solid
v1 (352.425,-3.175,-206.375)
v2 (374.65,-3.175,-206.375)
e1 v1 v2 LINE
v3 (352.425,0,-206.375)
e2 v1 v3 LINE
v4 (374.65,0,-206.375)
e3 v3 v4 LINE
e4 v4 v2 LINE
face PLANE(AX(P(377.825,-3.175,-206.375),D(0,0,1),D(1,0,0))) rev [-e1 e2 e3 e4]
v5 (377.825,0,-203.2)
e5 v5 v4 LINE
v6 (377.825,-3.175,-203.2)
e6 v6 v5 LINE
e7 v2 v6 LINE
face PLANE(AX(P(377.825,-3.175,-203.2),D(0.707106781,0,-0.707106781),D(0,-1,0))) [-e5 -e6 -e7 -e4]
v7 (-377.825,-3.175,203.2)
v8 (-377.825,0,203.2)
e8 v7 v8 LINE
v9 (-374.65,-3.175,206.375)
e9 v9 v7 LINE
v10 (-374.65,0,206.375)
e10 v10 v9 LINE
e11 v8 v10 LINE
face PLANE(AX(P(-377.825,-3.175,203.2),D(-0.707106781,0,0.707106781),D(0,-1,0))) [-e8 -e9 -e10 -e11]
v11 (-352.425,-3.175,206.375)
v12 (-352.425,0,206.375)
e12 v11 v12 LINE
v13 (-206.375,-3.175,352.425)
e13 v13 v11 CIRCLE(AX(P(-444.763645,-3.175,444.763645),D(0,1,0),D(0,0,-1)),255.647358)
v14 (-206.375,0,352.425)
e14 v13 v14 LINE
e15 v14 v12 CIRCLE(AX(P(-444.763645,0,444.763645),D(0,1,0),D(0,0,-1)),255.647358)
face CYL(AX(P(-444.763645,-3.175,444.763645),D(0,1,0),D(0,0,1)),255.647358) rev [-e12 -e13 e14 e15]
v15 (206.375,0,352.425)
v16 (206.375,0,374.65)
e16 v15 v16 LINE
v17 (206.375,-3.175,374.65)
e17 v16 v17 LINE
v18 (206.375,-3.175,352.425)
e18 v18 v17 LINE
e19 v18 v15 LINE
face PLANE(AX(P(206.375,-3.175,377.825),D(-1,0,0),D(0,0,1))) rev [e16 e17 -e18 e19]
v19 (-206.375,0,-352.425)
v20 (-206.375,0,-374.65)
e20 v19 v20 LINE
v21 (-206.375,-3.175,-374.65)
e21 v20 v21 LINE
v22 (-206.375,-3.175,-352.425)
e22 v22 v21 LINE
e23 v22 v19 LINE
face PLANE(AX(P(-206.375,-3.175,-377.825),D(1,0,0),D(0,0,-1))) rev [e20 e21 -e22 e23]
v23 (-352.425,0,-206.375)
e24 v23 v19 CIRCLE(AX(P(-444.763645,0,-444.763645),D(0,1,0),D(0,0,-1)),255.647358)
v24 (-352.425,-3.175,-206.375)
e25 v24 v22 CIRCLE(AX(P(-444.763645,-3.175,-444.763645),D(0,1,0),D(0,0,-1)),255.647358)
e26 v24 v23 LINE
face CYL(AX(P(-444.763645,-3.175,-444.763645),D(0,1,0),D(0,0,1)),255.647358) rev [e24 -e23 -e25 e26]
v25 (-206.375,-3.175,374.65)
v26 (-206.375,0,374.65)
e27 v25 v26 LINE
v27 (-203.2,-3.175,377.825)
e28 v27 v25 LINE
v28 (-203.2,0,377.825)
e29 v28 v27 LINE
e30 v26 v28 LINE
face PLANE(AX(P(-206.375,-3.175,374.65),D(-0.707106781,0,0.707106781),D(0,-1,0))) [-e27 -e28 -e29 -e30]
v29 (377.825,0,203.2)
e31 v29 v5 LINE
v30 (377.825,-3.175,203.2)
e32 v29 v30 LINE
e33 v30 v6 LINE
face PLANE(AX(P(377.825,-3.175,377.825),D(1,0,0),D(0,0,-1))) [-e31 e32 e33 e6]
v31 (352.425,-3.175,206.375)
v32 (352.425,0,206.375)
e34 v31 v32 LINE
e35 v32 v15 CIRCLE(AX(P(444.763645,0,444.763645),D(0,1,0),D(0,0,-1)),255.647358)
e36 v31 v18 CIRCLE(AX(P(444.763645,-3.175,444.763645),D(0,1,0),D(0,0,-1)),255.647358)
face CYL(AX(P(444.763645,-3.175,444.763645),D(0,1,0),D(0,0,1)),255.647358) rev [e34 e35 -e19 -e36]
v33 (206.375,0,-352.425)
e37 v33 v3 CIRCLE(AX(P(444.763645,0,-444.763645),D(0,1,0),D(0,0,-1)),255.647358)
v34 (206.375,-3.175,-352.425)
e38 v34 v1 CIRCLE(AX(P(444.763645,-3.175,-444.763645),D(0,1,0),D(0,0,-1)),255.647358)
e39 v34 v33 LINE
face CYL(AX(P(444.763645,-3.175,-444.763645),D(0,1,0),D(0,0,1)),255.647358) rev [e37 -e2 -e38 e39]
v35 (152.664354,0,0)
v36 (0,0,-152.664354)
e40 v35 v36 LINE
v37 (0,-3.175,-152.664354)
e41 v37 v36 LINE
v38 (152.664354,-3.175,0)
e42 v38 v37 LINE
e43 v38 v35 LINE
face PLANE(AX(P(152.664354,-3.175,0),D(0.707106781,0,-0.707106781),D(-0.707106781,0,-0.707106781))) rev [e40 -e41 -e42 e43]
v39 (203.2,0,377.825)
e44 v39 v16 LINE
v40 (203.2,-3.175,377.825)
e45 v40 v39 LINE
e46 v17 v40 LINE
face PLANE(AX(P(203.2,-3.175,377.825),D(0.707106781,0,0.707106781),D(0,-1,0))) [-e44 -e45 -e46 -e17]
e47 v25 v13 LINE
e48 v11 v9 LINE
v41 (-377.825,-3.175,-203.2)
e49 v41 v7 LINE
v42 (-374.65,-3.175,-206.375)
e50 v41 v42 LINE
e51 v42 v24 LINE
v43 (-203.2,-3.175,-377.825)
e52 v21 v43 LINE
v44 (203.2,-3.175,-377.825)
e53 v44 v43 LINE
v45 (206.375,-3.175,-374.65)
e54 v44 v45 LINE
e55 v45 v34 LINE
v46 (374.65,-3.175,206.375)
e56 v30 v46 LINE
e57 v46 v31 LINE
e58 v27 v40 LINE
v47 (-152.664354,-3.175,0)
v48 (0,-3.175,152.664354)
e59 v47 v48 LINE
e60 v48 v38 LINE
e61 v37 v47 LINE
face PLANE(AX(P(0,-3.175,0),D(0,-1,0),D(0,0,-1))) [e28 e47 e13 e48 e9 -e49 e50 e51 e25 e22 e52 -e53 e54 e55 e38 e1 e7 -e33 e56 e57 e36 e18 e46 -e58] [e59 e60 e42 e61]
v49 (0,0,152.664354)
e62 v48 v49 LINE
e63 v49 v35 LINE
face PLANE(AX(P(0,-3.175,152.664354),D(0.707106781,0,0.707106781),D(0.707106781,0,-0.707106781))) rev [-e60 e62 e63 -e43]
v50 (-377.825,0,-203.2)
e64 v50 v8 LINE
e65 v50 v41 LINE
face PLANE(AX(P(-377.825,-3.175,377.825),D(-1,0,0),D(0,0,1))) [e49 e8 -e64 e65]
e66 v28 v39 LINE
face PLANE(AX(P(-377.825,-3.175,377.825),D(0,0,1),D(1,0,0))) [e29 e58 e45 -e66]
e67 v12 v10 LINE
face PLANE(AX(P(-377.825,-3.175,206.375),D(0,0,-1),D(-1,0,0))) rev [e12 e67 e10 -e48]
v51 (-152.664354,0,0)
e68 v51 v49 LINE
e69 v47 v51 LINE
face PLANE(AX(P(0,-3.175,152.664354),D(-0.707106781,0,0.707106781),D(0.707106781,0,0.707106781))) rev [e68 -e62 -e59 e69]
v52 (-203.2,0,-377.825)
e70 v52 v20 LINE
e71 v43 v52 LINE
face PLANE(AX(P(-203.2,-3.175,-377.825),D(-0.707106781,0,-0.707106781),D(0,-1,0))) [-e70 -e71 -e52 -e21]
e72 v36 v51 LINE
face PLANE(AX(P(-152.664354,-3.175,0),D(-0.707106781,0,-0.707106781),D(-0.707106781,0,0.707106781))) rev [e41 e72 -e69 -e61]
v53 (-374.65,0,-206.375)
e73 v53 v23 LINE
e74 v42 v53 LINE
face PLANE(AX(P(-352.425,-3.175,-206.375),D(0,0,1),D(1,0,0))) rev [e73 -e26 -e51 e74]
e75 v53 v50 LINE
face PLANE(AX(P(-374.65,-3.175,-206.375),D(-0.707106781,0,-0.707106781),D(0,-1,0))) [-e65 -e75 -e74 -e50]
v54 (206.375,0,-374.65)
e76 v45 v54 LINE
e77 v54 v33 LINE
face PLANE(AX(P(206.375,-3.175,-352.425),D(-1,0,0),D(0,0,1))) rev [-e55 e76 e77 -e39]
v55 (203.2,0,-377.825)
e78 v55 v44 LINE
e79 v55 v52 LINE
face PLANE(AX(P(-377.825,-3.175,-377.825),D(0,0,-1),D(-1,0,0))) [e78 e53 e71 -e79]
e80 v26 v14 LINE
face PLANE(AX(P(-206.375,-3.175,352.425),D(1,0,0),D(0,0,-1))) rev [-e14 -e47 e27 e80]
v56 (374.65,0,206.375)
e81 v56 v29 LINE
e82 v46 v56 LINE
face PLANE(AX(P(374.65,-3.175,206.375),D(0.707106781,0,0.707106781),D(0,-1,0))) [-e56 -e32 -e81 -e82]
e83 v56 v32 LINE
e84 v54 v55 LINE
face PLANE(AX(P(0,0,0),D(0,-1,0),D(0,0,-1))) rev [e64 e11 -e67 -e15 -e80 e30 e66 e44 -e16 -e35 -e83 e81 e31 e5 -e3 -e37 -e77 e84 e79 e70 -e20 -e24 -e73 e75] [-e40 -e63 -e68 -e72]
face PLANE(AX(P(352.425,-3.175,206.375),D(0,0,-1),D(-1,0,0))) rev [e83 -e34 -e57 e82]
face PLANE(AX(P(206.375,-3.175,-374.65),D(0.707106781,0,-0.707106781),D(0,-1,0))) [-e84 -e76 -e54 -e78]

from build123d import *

# Parameters (mm, degrees)
SKETCH2_W           = 755.65
SKETCH2_H           = 755.65
BASE_FLANGE1_DEPTH  = 3.175
CUT_EXTRUDE1_DEPTH  = 535.334672162
CUT_EXTRUDE2_DEPTH  = 535.334672162
BREAK_CORNER1_START = -3.175
BREAK_CORNER1_DEPTH = 3.175


# Read off the part's stored shape, not the designer's step: Break-Corner1
# Sheet-metal steps are written as plain solids
with BuildPart() as part:
    # Sketch2 → Base-Flange1 (new body)
    with BuildSketch(Plane(origin=(0, 0, 0), x_dir=(1, 0, 0), z_dir=(0, 1, 0))):
        Rectangle(SKETCH2_W, SKETCH2_H)
    extrude(amount=-BASE_FLANGE1_DEPTH)

    # Sketch3 → Cut-Extrude1 (cut, through all)
    with BuildSketch(Plane(origin=(0, 0, 0), x_dir=(1, 0, 0), z_dir=(0, 1, 0))):
        Polygon((0, -152.664354058), (152.664354058, 0), (0, 152.664354058), (-152.664354058, 0), align=None)
    extrude(amount=-CUT_EXTRUDE1_DEPTH, mode=Mode.SUBTRACT)

    # Sketch4 → Cut-Extrude2 (cut, through all)
    with BuildSketch(Plane(origin=(0, 0, 0), x_dir=(1, 0, 0), z_dir=(0, 1, 0))):
        with BuildLine():
            Line((377.825, 206.375), (352.425, 206.375))
            ThreePointArc((352.425, 206.375), (263.993664919, 263.993664919), (206.375, 352.425))
            Line((206.375, 352.425), (206.375, 377.825))
            Line((206.375, 377.825), (377.825, 377.825))
            Line((377.825, 377.825), (377.825, 206.375))
        make_face()
        with BuildLine():
            Line((206.375, -377.825), (206.375, -352.425))
            ThreePointArc((206.375, -352.425), (263.993664919, -263.993664919), (352.425, -206.375))
            Line((352.425, -206.375), (377.825, -206.375))
            Line((377.825, -206.375), (377.825, -377.825))
            Line((377.825, -377.825), (206.375, -377.825))
        make_face()
        with BuildLine():
            Line((-377.825, -206.375), (-352.425, -206.375))
            ThreePointArc((-352.425, -206.375), (-263.993664919, -263.993664919), (-206.375, -352.425))
            Line((-206.375, -352.425), (-206.375, -377.825))
            Line((-206.375, -377.825), (-377.825, -377.825))
            Line((-377.825, -377.825), (-377.825, -206.375))
        make_face()
        with BuildLine():
            Line((-206.375, 377.825), (-206.375, 352.425))
            ThreePointArc((-206.375, 352.425), (-263.993664919, 263.993664919), (-352.425, 206.375))
            Line((-352.425, 206.375), (-377.825, 206.375))
            Line((-377.825, 206.375), (-377.825, 377.825))
            Line((-377.825, 377.825), (-206.375, 377.825))
        make_face()
    extrude(amount=-CUT_EXTRUDE2_DEPTH, mode=Mode.SUBTRACT)

    # Break-Corner1 outline → Break-Corner1 (cut)
    with BuildSketch(Plane(origin=(0, 0, 0), x_dir=(1, 0, 0), z_dir=(0, 1, 0)).offset(BREAK_CORNER1_START)):
        Polygon((-206.375, 374.65), (-203.2, 377.825), (-206.375, 377.825), align=None)
        Polygon((203.2, 377.825), (206.375, 374.65), (206.375, 377.825), align=None)
        Polygon((377.825, -206.375), (377.825, -203.2), (374.65, -206.375), align=None)
        Polygon((374.65, 206.375), (377.825, 203.2), (377.825, 206.375), align=None)
        Polygon((-374.65, -206.375), (-377.825, -203.2), (-377.825, -206.375), align=None)
        Polygon((-377.825, 203.2), (-374.65, 206.375), (-377.825, 206.375), align=None)
        Polygon((206.375, -374.65), (203.2, -377.825), (206.375, -377.825), align=None)
        Polygon((-203.2, -377.825), (-206.375, -374.65), (-206.375, -377.825), align=None)
    extrude(amount=BREAK_CORNER1_DEPTH, mode=Mode.SUBTRACT)


solid = part.part
